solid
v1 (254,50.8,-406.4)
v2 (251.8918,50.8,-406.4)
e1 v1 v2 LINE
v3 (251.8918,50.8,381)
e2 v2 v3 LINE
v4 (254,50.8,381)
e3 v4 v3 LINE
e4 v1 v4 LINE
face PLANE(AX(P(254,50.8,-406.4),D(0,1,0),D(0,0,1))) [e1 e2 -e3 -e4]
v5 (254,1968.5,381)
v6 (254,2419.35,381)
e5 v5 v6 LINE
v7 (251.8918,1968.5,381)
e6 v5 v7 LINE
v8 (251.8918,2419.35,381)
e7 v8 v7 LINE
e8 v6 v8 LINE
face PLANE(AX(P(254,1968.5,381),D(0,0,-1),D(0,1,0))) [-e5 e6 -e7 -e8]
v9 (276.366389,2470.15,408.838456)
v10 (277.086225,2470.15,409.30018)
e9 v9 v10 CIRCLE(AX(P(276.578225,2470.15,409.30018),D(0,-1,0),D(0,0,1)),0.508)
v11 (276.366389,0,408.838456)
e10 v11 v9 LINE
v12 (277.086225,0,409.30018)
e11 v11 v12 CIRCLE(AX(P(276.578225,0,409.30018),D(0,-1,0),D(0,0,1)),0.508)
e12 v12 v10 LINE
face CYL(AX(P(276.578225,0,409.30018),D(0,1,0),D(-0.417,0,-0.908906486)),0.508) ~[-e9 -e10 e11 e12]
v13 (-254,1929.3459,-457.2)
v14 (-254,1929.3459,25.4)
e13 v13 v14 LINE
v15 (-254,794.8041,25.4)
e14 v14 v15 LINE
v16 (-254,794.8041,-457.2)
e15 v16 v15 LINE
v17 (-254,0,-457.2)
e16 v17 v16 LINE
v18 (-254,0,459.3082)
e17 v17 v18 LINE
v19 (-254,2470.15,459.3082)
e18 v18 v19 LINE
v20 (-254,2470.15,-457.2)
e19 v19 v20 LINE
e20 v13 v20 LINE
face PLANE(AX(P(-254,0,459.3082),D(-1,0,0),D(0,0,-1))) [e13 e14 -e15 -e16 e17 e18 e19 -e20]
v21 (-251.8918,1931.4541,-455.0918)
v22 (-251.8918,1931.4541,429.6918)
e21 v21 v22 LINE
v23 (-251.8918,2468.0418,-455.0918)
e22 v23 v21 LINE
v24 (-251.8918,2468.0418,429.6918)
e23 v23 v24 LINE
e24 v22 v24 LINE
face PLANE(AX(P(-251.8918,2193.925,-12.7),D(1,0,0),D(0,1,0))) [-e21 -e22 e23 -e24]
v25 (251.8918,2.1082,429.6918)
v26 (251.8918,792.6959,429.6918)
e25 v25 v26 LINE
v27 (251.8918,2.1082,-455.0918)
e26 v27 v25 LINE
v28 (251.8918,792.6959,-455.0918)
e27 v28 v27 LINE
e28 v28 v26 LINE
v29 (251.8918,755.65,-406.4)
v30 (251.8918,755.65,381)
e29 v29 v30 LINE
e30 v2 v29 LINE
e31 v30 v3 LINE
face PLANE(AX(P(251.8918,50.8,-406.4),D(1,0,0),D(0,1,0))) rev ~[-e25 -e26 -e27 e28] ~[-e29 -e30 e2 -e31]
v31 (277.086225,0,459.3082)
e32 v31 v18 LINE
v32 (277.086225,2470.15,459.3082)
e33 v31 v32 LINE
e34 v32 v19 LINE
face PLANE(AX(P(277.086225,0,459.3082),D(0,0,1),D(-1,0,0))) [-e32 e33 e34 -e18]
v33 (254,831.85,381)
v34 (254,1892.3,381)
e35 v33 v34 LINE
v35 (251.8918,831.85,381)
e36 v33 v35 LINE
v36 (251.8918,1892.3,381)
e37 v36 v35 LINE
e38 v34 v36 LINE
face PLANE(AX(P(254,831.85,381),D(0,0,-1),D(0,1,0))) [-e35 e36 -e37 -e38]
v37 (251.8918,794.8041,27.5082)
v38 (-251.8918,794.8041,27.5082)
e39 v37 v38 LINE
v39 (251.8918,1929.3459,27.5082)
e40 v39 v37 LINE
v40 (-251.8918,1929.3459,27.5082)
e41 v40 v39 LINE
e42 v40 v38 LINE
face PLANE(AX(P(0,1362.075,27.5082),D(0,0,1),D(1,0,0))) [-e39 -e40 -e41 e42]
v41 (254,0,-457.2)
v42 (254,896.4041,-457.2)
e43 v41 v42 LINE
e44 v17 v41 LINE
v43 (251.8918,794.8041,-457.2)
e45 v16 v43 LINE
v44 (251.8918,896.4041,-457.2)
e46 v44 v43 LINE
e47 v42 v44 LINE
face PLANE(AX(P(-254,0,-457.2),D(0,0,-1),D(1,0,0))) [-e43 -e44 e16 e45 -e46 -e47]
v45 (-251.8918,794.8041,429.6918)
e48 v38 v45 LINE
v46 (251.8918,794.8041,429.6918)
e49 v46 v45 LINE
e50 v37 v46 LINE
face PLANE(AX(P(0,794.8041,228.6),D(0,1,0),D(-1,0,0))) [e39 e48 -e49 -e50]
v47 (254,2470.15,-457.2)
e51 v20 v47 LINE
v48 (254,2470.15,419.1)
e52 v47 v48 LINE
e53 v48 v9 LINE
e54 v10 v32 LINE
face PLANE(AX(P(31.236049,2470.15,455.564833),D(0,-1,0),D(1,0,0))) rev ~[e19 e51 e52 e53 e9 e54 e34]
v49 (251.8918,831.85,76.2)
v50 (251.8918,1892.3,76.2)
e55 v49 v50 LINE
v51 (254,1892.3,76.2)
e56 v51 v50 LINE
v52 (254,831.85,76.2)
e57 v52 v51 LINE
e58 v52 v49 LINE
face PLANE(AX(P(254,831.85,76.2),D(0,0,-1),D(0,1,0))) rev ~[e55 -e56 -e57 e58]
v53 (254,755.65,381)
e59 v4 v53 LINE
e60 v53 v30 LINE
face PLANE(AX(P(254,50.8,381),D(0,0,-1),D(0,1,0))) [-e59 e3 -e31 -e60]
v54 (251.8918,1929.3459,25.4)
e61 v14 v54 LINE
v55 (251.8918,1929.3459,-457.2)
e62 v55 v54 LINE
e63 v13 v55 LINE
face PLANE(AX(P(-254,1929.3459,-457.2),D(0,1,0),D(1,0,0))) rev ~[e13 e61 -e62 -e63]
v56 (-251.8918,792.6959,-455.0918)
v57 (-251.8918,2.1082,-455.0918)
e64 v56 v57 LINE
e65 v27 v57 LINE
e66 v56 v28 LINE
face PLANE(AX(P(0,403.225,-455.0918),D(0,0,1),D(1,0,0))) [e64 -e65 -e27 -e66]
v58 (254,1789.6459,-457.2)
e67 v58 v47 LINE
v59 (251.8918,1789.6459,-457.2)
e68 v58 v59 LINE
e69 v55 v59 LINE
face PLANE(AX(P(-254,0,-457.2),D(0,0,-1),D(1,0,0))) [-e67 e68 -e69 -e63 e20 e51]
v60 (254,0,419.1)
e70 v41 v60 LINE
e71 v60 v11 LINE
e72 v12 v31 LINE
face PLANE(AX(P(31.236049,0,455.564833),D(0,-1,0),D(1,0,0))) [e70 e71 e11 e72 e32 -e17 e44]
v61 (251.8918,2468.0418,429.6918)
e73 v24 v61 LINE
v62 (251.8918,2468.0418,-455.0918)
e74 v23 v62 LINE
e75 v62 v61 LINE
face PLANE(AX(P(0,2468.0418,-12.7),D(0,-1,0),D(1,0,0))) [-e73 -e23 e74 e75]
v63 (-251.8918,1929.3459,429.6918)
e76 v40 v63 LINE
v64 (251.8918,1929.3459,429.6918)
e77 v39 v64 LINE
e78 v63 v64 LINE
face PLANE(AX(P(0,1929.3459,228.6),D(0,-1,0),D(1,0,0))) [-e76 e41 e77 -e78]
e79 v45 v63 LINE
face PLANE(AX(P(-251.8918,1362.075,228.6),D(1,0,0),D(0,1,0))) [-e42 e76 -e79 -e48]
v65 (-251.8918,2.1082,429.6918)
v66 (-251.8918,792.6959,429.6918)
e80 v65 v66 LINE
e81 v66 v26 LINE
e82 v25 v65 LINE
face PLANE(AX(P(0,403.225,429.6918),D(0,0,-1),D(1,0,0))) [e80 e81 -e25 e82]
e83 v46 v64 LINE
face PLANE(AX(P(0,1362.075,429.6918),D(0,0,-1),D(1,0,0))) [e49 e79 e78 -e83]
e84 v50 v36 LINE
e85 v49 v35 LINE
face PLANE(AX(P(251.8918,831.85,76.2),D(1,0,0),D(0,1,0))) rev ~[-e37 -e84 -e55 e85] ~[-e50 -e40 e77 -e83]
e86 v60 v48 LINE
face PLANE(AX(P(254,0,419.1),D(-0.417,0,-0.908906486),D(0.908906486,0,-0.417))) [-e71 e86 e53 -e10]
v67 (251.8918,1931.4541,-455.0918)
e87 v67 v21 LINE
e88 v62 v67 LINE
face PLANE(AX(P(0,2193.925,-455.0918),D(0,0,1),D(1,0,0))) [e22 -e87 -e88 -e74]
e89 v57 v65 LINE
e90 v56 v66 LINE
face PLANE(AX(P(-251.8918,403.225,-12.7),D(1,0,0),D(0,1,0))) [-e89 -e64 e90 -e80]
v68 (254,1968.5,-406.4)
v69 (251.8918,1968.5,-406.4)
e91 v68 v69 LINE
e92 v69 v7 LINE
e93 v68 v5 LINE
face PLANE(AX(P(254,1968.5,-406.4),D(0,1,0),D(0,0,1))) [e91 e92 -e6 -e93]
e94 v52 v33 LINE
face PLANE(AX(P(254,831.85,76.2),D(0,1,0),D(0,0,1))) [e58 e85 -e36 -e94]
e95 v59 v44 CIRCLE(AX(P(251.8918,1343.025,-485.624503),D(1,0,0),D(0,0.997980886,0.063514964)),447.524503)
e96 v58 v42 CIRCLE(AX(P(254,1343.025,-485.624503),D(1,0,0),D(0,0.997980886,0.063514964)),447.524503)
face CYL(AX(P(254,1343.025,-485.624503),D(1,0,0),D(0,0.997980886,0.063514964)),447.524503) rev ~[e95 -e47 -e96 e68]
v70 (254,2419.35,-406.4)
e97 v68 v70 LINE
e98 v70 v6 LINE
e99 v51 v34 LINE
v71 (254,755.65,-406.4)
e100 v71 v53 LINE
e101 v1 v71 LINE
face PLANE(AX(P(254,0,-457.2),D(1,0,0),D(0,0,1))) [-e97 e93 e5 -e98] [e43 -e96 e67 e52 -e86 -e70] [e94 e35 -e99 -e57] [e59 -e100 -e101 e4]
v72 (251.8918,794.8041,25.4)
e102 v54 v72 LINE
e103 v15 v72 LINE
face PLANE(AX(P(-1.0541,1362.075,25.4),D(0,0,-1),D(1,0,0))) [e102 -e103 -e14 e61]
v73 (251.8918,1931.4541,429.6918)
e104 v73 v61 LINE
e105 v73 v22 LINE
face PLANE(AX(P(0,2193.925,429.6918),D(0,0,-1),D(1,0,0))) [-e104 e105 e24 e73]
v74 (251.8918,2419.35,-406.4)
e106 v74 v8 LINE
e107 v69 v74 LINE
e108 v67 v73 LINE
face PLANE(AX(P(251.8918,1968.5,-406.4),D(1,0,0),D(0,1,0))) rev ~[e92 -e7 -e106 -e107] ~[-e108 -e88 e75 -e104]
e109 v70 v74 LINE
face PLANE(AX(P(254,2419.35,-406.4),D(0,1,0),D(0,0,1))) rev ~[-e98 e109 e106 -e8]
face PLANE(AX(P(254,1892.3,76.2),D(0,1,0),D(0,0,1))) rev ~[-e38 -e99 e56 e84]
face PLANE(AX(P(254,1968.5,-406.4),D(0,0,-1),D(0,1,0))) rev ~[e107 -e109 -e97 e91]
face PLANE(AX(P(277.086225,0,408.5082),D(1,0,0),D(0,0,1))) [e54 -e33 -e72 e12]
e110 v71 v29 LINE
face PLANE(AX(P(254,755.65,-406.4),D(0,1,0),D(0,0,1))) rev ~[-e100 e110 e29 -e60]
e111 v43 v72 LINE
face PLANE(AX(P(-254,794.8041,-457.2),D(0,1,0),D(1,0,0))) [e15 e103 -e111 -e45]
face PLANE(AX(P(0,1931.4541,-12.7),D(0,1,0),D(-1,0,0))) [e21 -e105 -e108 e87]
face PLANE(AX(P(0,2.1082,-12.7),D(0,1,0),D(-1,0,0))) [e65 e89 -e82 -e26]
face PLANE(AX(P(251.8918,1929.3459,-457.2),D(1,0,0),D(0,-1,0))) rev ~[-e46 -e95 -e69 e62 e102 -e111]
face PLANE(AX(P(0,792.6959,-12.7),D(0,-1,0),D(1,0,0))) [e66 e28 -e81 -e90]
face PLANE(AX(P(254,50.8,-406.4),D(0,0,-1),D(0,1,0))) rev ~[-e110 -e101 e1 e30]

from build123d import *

# Parameters (mm, degrees)
F0_W      = 508
F0_H      = 914.4
F1_DEPTH  = 2470.15
F2_W      = 704.85
F2_H      = 787.4
F2_W_2    = 1060.45
F2_H_2    = 304.8
F2_W_3    = 450.85
F3_DEPTH  = 505.8918
F4_W      = 503.7836
F4_H      = 704.85
F5_DEPTH  = 48.6918
F6_W      = 503.7836
F6_H      = 704.85
F7_DEPTH  = 48.6918
F8_W      = 503.7836
F8_H      = 884.7836
F9_DEPTH  = 48.6918
F10_W     = 503.7836
F10_H     = 884.7836
F11_DEPTH = 37.0459
F12_W     = 503.7836
F12_H     = 1060.45
F13_DEPTH = 48.6918
F14_W     = 503.7836
F14_H     = 1060.45
F15_DEPTH = 48.6918
F16_W     = 503.7836
F16_H     = 402.1836
F17_DEPTH = 37.0459
F18_W     = 503.7836
F18_H     = 402.1836
F19_DEPTH = 37.0459
F20_W     = 503.7836
F20_H     = 450.85
F21_DEPTH = 48.6918
F22_W     = 503.7836
F22_H     = 450.85
F23_DEPTH = 48.6918
F24_W     = 503.7836
F24_H     = 884.7836
F25_DEPTH = 37.0459
F26_W     = 503.7836
F26_H     = 884.7836
F27_DEPTH = 48.6918
F28_W     = 505.8918
F28_H     = 1134.5418
F29_DEPTH = 482.6
F31_DEPTH = 508.001
F33_DEPTH = 2470.15
F34_R     = 0.508


with BuildPart() as f1:
    # F0 (on Front) → F1 (new body)
    with BuildSketch(Plane.XZ):
        Rectangle(F0_W, F0_H)
    extrude(amount=-F1_DEPTH)

    # F2 (on face) → F3 (cut)
    with BuildSketch(Plane.YZ.offset(254)):
        with Locations((403.225, -12.7)):
            Rectangle(F2_W, F2_H)
        with Locations((1362.075, 228.6)):
            Rectangle(F2_W_2, F2_H_2)
        with Locations((2193.925, -12.7)):
            Rectangle(F2_W_3, F2_H)
    extrude(amount=-F3_DEPTH, mode=Mode.SUBTRACT)

    # F4 (on face) → F5 (cut)
    with BuildSketch(Plane.XY.offset(-406.4)):
        with Locations((0, 403.225)):
            Rectangle(F4_W, F4_H)
    extrude(amount=-F5_DEPTH, mode=Mode.SUBTRACT)

    # F6 (on face) → F7 (cut)
    with BuildSketch(Plane(origin=(0, 0, 381), x_dir=(1, 0, 0), z_dir=(0, 0, -1))):
        with Locations((0, -403.225)):
            Rectangle(F6_W, F6_H)
    extrude(amount=-F7_DEPTH, mode=Mode.SUBTRACT)

    # F8 (on face) → F9 (cut)
    with BuildSketch(Plane(origin=(0, 50.8, 0), x_dir=(-1, 0, 0), z_dir=(0, 1, 0))):
        with Locations((0, -12.7)):
            Rectangle(F8_W, F8_H)
    extrude(amount=-F9_DEPTH, mode=Mode.SUBTRACT)

    # F10 (on face) → F11 (cut)
    with BuildSketch(Plane.XZ.offset(-755.65)):
        with Locations((0, -12.7)):
            Rectangle(F10_W, F10_H)
    extrude(amount=-F11_DEPTH, mode=Mode.SUBTRACT)

    # F12 (on face) → F13 (cut)
    with BuildSketch(Plane.XY.offset(76.2)):
        with Locations((0, 1362.075)):
            Rectangle(F12_W, F12_H)
    extrude(amount=-F13_DEPTH, mode=Mode.SUBTRACT)

    # F14 (on face) → F15 (cut)
    with BuildSketch(Plane(origin=(0, 0, 381), x_dir=(1, 0, 0), z_dir=(0, 0, -1))):
        with Locations((0, -1362.075)):
            Rectangle(F14_W, F14_H)
    extrude(amount=-F15_DEPTH, mode=Mode.SUBTRACT)

    # F16 (on face) → F17 (cut)
    with BuildSketch(Plane(origin=(0, 831.85, 0), x_dir=(-1, 0, 0), z_dir=(0, 1, 0))):
        with Locations((0, 228.6)):
            Rectangle(F16_W, F16_H)
    extrude(amount=-F17_DEPTH, mode=Mode.SUBTRACT)

    # F18 (on face) → F19 (cut)
    with BuildSketch(Plane.XZ.offset(-1892.3)):
        with Locations((0, 228.6)):
            Rectangle(F18_W, F18_H)
    extrude(amount=-F19_DEPTH, mode=Mode.SUBTRACT)

    # F20 (on face) → F21 (cut)
    with BuildSketch(Plane.XY.offset(-406.4)):
        with Locations((0, 2193.925)):
            Rectangle(F20_W, F20_H)
    extrude(amount=-F21_DEPTH, mode=Mode.SUBTRACT)

    # F22 (on face) → F23 (cut)
    with BuildSketch(Plane(origin=(0, 0, 381), x_dir=(1, 0, 0), z_dir=(0, 0, -1))):
        with Locations((0, -2193.925)):
            Rectangle(F22_W, F22_H)
    extrude(amount=-F23_DEPTH, mode=Mode.SUBTRACT)

    # F24 (on face) → F25 (cut)
    with BuildSketch(Plane(origin=(0, 1968.5, 0), x_dir=(-1, 0, 0), z_dir=(0, 1, 0))):
        with Locations((0, -12.7)):
            Rectangle(F24_W, F24_H)
    extrude(amount=-F25_DEPTH, mode=Mode.SUBTRACT)

    # F26 (on face) → F27 (cut)
    with BuildSketch(Plane.XZ.offset(-2419.35)):
        with Locations((0, -12.7)):
            Rectangle(F26_W, F26_H)
    extrude(amount=-F27_DEPTH, mode=Mode.SUBTRACT)

    # F28 (on face) → F29 (cut)
    with BuildSketch(Plane(origin=(0, 0, -457.2), x_dir=(1, 0, 0), z_dir=(0, 0, -1))):
        with Locations((-1.0541, -1362.075)):
            Rectangle(F28_W, F28_H)
    extrude(amount=-F29_DEPTH, mode=Mode.SUBTRACT)

    # F30 (on face) → F31 (cut, through all)
    with BuildSketch(Plane.YZ.offset(254)):
        with BuildLine():
            Line((896.4041, -457.2), (1789.6459, -457.2))
            ThreePointArc((1789.6459, -457.2), (1343.025, -38.1), (896.4041, -457.2))
        make_face()
    extrude(amount=-F31_DEPTH, mode=Mode.SUBTRACT)

    # F32 (on face) → F33 (join, through all)
    with BuildSketch(Plane.XZ):
        Polygon((277.0862247403, 459.3082), (-254, 459.3082), (-254, 457.2), (254, 457.2), (254, 419.1), (277.0862247403, 408.5082), align=None)
    extrude(amount=-F33_DEPTH)

    # F34
    f34_edges = [f1.edges().sort_by_distance(p)[0] for p in [
        (277.086225, 1235.075, 408.5082),
    ]]
    fillet(f34_edges, radius=F34_R)


solid = f1.part
